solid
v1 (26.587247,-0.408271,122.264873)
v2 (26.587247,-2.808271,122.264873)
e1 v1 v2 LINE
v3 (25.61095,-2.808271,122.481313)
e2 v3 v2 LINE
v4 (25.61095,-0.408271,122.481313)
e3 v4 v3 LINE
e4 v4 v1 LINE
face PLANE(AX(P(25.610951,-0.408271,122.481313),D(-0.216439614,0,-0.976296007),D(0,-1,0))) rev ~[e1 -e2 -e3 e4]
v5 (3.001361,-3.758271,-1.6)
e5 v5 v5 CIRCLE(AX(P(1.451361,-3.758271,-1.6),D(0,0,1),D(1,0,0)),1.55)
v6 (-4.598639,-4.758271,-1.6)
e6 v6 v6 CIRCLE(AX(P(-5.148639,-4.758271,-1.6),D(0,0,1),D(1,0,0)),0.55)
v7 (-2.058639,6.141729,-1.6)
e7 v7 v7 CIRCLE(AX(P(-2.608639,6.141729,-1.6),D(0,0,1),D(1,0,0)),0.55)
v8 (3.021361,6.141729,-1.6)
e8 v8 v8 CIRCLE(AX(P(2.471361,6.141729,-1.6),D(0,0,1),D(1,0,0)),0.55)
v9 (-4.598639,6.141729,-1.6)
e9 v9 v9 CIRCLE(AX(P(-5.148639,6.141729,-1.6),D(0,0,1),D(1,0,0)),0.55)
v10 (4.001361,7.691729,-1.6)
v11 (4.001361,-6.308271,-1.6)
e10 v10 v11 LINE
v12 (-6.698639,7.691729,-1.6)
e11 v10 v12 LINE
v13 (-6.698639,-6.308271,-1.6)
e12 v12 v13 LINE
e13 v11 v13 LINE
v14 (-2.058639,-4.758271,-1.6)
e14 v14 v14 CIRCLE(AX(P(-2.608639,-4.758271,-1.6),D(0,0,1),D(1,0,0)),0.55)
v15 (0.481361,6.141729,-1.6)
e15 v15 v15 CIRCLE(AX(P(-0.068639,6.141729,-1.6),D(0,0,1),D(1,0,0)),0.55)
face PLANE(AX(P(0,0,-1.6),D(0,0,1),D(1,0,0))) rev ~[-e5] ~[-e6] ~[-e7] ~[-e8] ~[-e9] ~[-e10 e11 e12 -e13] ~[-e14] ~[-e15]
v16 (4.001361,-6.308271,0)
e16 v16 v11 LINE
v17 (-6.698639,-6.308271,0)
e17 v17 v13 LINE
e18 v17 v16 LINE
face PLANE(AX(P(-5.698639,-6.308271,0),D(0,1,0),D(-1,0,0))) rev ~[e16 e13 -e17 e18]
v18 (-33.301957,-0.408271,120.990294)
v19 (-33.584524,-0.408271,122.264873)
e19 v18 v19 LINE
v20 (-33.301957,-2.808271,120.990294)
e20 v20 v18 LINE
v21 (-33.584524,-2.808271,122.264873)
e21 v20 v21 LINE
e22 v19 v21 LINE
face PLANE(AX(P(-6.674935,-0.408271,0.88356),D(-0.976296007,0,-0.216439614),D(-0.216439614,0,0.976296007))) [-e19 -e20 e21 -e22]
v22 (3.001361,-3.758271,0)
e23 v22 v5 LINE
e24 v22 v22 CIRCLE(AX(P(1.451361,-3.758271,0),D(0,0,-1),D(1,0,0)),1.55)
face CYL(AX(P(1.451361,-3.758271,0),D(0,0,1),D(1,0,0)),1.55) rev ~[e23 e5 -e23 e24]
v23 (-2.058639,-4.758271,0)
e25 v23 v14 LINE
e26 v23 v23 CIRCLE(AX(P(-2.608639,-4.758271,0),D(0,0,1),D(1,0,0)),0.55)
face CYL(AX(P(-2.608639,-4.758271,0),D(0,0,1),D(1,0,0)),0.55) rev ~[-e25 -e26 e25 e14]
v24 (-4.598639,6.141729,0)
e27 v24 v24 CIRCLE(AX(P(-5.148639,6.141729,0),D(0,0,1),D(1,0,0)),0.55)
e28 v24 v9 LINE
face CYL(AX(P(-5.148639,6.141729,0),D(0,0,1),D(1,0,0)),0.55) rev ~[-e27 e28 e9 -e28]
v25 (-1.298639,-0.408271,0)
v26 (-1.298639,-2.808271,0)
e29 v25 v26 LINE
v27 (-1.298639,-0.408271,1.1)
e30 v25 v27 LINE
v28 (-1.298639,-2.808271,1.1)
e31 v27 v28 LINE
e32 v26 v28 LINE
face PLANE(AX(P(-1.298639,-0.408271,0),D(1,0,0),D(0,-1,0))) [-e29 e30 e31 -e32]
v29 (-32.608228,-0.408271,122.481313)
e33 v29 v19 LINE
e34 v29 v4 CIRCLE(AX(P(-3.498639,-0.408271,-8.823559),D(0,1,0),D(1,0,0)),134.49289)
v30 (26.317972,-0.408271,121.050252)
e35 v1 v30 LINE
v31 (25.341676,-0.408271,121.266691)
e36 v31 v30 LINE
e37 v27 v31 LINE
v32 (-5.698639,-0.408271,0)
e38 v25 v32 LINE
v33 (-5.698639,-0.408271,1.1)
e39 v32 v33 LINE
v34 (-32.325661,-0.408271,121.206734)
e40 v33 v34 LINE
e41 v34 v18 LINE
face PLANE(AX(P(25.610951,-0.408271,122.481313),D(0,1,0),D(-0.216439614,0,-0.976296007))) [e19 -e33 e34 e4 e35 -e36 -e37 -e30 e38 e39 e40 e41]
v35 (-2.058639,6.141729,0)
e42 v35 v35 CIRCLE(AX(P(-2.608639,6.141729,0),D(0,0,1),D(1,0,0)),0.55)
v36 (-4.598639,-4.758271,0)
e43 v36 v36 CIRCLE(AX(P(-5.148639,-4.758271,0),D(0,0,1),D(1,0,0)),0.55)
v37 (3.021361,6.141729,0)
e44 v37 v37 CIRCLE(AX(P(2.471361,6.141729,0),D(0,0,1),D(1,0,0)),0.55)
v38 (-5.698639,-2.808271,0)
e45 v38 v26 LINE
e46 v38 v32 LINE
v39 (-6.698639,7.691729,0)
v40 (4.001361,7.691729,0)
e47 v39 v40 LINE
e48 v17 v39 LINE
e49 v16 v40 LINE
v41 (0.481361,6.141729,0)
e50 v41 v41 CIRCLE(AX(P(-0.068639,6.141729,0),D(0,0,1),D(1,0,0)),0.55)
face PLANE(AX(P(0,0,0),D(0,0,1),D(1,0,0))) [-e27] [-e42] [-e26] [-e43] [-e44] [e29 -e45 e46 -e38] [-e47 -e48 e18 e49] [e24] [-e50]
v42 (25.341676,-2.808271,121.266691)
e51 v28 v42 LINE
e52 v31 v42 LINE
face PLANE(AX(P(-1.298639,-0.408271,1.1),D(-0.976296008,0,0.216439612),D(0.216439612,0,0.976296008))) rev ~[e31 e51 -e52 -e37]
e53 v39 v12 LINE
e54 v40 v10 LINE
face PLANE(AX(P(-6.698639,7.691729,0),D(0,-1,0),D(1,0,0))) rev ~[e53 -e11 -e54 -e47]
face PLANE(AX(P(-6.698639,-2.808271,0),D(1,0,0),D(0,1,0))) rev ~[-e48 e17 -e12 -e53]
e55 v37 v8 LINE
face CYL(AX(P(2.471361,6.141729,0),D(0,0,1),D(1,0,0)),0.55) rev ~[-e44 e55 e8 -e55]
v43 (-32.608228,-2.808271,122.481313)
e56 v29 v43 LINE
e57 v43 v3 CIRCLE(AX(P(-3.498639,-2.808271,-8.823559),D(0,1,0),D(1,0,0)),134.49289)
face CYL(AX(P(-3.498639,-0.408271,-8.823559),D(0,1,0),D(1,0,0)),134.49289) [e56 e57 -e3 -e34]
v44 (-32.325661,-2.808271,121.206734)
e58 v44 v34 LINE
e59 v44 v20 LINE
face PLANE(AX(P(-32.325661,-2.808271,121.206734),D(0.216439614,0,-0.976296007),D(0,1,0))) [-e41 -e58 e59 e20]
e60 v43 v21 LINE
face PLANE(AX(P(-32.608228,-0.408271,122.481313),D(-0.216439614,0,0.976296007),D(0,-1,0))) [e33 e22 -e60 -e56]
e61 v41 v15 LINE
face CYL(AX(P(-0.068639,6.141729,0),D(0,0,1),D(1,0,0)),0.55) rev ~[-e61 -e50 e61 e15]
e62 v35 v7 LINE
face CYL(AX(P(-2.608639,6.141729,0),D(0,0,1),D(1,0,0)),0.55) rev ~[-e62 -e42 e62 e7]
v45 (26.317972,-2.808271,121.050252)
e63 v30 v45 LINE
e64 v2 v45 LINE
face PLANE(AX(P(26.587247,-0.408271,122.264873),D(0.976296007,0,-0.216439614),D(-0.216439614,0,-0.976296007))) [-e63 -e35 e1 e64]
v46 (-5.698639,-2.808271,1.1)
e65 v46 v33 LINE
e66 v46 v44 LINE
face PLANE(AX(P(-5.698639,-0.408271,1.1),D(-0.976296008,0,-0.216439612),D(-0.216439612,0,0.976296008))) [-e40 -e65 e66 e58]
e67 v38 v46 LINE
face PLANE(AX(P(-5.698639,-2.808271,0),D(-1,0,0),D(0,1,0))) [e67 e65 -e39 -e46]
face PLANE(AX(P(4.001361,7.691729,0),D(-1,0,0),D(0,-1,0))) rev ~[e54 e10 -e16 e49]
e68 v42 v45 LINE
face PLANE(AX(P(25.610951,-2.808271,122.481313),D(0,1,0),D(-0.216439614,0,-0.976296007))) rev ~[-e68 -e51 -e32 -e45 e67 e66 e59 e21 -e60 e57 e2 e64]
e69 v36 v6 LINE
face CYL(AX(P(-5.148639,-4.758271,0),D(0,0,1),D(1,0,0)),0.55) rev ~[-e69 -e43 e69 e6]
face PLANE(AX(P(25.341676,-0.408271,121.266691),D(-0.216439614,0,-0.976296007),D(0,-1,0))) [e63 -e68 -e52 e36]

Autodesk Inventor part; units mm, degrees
ref_plane "YZ Plane" through (0, 0, 0) normal (1, 0, 0) x (0, 1, 0)
ref_plane "XZ Plane" through (0, 0, 0) normal (0, 1, 0) x (-1, 0, 0)
ref_plane "XY Plane" through (0, 0, 0) normal (0, 0, 1) x (1, 0, 0)
sketch "Sketch1" plane through (0, 0, 0) normal (0, 0, 1) x (1, 0, 0)
  line L0 (-6.698639, 7.691729) -> (4.001361, 7.691729)
  line L1 (4.001361, 7.691729) -> (4.001361, -6.308271)
  line L2 (4.001361, -6.308271) -> (-6.698639, -6.308271)
  line L3 (-6.698639, -6.308271) -> (-6.698639, 7.691729)
  line L4 (4.001361, -6.308271) -> (-6.698639, -6.308271)
  line L5 (-6.698639, -6.308271) -> (-6.698639, -2.808271)
  line L6 (-6.698639, -2.808271) -> (4.001361, -2.808271)
  line L7 (4.001361, -2.808271) -> (4.001361, -6.308271)
  line L8 (-6.698639, -6.308271) -> (-5.698639, -6.308271)
  line L9 (-5.698639, -6.308271) -> (-5.698639, 7.691729)
  line L10 (-5.698639, 7.691729) -> (-6.698639, 7.691729)
  line L11 (-6.698639, 7.691729) -> (-6.698639, -6.308271)
  line L12 (-5.698639, -2.808271) -> (3.472299, -2.808271)
  line L13 (3.472299, -2.808271) -> (3.472299, -0.408271)
  line L14 (3.472299, -0.408271) -> (-5.698639, -0.408271)
  line L15 (-5.698639, -0.408271) -> (-5.698639, -2.808271)
  line L16 (-5.698639, -0.408271) -> (-1.298639, -0.408271)
  line L17 (-1.298639, -0.408271) -> (-1.298639, -2.808271)
  line L18 (-1.298639, -2.808271) -> (-5.698639, -2.808271)
  line L19 (-5.698639, -2.808271) -> (-5.698639, -0.408271)
  point P0 (0, 0)
  dimension "d0" = 10.7
  dimension "d1" = 14
  dimension "d2" = 3.5
  dimension "d3" = 1
  dimension "d4" = 2.4
  dimension "d5" = 4.4
extrude "Extrusion1" add sketch "Sketch1" against normal blind 1.6
extrude "Extrusion2" add sketch "Sketch1" along normal blind 1.1 contours L14 L17 L6 L9
sketch "Sketch2" plane through (0, 0, 0) normal (0, 0, 1) x (1, 0, 0)
  line L0 (-1.298639, -0.408271) -> (-1.298639, -2.808271)
  line L1 (-1.298639, -2.808271) -> (-5.698639, -2.808271)
  line L2 (-5.698639, -2.808271) -> (-5.698639, -0.408271)
  line L3 (-5.698639, -0.408271) -> (-1.298639, -0.408271)
  line L4 (4.001361, 7.691729) -> (-6.698639, 7.691729)
  line L5 (-6.698639, 7.691729) -> (-6.698639, -6.308271)
  line L6 (-6.698639, -6.308271) -> (4.001361, -6.308271)
  line L7 (4.001361, -6.308271) -> (4.001361, 7.691729)
  line L8 (4.001361, -6.308271) -> (4.001361, 7.691729)
  line L9 (-6.698639, 7.691729) -> (-6.698639, -6.308271)
  line L10 (4.001361, -6.308271) -> (-6.698639, -6.308271)
  line L11 (-6.698639, -6.308271) -> (-6.698639, -5.308271)
  line L12 (-6.698639, -5.308271) -> (4.001361, -5.308271)
  line L13 (4.001361, -5.308271) -> (4.001361, -6.308271)
  line L14 (4.001361, -6.308271) -> (3.001361, -6.308271)
  line L15 (3.001361, -6.308271) -> (3.001361, -2.808271)
  line L16 (3.001361, -2.808271) -> (4.001361, -2.808271)
  line L17 (4.001361, -2.808271) -> (4.001361, -6.308271)
  line L18 (-6.698639, -6.308271) -> (-0.098639, -6.308271)
  line L19 (-0.098639, -6.308271) -> (-0.098639, -2.808271)
  line L20 (-0.098639, -2.808271) -> (-6.698639, -2.808271)
  line L21 (-6.698639, -2.808271) -> (-6.698639, -6.308271)
  circle A0 centre (1.451361, -3.758271) radius 1.55
  point P0 (0, 0)
  dimension "d10" = 1
  dimension "d11" = 1
  dimension "d12" = 6.6
extrude "Extrusion3" cut sketch "Sketch2" against normal through all contours A0
sketch "Sketch3" plane through (0, 0, 0) normal (0, 0, 1) x (1, 0, 0)
  line L0 (4.001361, 7.691729) -> (4.001361, -6.308271)
  line L1 (-6.698639, 7.691729) -> (4.001361, 7.691729)
  line L2 (4.001361, 7.691729) -> (4.001361, 6.691729)
  line L3 (4.001361, 6.691729) -> (-6.698639, 6.691729)
  line L4 (-6.698639, 6.691729) -> (-6.698639, 7.691729)
  line L5 (-6.698639, 7.691729) -> (-5.698639, 7.691729)
  line L6 (-5.698639, 7.691729) -> (-5.698639, 5.612457)
  line L7 (-5.698639, 5.612457) -> (-6.698639, 5.612457)
  line L8 (-6.698639, 5.612457) -> (-6.698639, 7.691729)
  line L9 (-5.698639, 6.691729) -> (-4.598639, 6.691729)
  line L10 (-4.598639, 6.691729) -> (-4.598639, 6.161753)
  line L11 (-4.598639, 6.161753) -> (-5.698639, 6.161753)
  line L12 (-5.698639, 6.161753) -> (-5.698639, 6.691729)
  circle A0 centre (-5.148639, 6.141729) radius 0.55
  circle A1 centre (-2.608639, 6.141729) radius 0.55
  line L13 (-2.058639, 6.161753) -> (-3.158639, 6.161753)
  circle A2 centre (-0.068639, 6.141729) radius 0.55
  line L14 (0.481361, 6.161753) -> (-0.618639, 6.161753)
  circle A3 centre (2.471361, 6.141729) radius 0.55
  line L15 (3.021361, 6.161753) -> (1.921361, 6.161753)
  circle A4 centre (1.451361, -3.758271) radius 1.55
  line L16 (-1.298639, -0.408271) -> (-1.298639, -2.808271)
  line L17 (-1.298639, -2.808271) -> (-5.698639, -2.808271)
  line L18 (-5.698639, -2.808271) -> (-5.698639, -0.408271)
  line L19 (-5.698639, -0.408271) -> (-1.298639, -0.408271)
  line L20 (4.001361, 7.691729) -> (-6.698639, 7.691729)
  line L21 (-6.698639, 7.691729) -> (-6.698639, -6.308271)
  line L22 (-6.698639, -6.308271) -> (4.001361, -6.308271)
  line L23 (4.001361, -6.308271) -> (4.001361, 7.691729)
  line L24 (-6.698639, -6.308271) -> (-5.698639, -6.308271)
  line L25 (-5.698639, -6.308271) -> (-5.698639, -3.371834)
  line L26 (-5.698639, -3.371834) -> (-6.698639, -3.371834)
  line L27 (-6.698639, -3.371834) -> (-6.698639, -6.308271)
  line L28 (-6.698639, -6.308271) -> (4.001361, -6.308271)
  line L29 (-6.698639, -6.308271) -> (-3.498639, -6.308271)
  line L30 (-3.498639, -6.308271) -> (-3.498639, -5.308271)
  line L31 (-3.498639, -5.308271) -> (-6.698639, -5.308271)
  line L32 (-6.698639, -5.308271) -> (-6.698639, -6.308271)
  line L33 (-5.698639, -6.308271) -> (-4.598639, -6.308271)
  line L34 (-4.598639, -6.308271) -> (-4.598639, -3.371834)
  line L35 (-4.598639, -3.371834) -> (-5.698639, -3.371834)
  line L36 (-5.698639, -3.371834) -> (-5.698639, -6.308271)
  circle A5 centre (-5.148639, -4.758271) radius 0.55
  circle A6 centre (-2.608639, -4.758271) radius 0.55
  line L37 (-0.958639, -5.308271) -> (-4.158639, -5.308271)
  point P0 (0, 0)
  dimension "d15" = 1
  dimension "d16" = 1
  dimension "d17" = 1.1
  dimension "d20" = 2.54
  dimension "d25" = 1
  dimension "d26" = 1
  dimension "d27" = 1.1
  dimension "d30" = 2.54
sketch "Sketch3 outline for Extrusion4" plane through (0, 0, 0) normal (0, 0, 1) x (1, 0, 0)
  circle A0 centre (-5.148639, -4.758271) radius 0.55
  circle A1 centre (-2.608639, -4.758271) radius 0.55
  circle A2 centre (2.471361, 6.141729) radius 0.55
  circle A3 centre (-0.068639, 6.141729) radius 0.55
  circle A4 centre (-2.608639, 6.141729) radius 0.55
  circle A5 centre (-5.148639, 6.141729) radius 0.55
extrude "Extrusion4" cut sketch "Sketch3 outline for Extrusion4" against normal through all
sketch "Sketch4" plane through (-5.698639, -0.408271, 0) normal (0, 1, 0) x (1, 0, 0)
  line L0 (0, 0) -> (4.4, 0)
  line L1 (0, 0) -> (0, -1.1)
  line L2 (4.4, -1.1) -> (0, -1.1)
  line L3 (4.4, 0) -> (4.4, -1.1)
  line L4 (0, -1.1) -> (4.4, -1.1)
  line L5 (2.2, -1.1) -> (2.2, 3.167795)
  line L6 (0, -1.1) -> (-26.909589, -122.481313)
  line L7 (0, -1.1) -> (4.299042, 18.291726)
  line L8 (4.4, -1.1) -> (31.309589, -122.481313)
  line L9 (4.4, -1.1) -> (0.100958, 18.291726)
  circle A0 centre (2.2, 8.823559) radius 134.49289
  point P0 (5.698639, 0)
  dimension "d37" = 12.5
extrude "Extrusion5" add sketch "Sketch4" against normal up to surface (2.4 mm away) contours L2 L8 A0 L6
sketch "Sketch5" plane through (-5.698639, -0.408271, 1.1) normal (-0.976296, 0, -0.2164396) x (-0.2164396, 0, 0.976296)
  line L0 (0, -2.4) -> (124.328392, -2.4)
  line L1 (124.328392, 0) -> (124.328392, -2.4)
  line L2 (0, 0) -> (124.328392, 0)
  line L3 (0, 0) -> (0, -2.4)
  line L4 (124.328392, 0) -> (124.328392, -2.4)
  line L5 (124.328392, 0) -> (111.727456, 0)
  line L6 (124.328392, -2.4) -> (123.022867, -2.4)
  line L7 (123.022867, -2.4) -> (123.022867, 0)
  line L8 (123.022867, 0) -> (124.328392, 0)
  line L9 (124.328392, 0) -> (124.328392, -2.4)
  point P0 (-2.307337, 0.408271)
  point P1 (123.022867, 0)
  point P2 (123.022867, -2.4)
extrude "Extrusion6" add sketch "Sketch5" along normal blind 1 contours L7 L2 L1 L0
sketch "Sketch6" plane through (25.610951, -0.408271, 122.481313) normal (0.976296, 0, -0.2164396) x (-0.2164396, 0, -0.976296)
  line L0 (0, -2.4) -> (124.328392, -2.4)
  line L1 (124.328392, -2.4) -> (124.328392, 0)
  line L2 (0, 0) -> (124.328392, 0)
  line L3 (0, 0) -> (0, -2.4)
  line L4 (0, 0) -> (0, -2.4)
  line L5 (0, -2.4) -> (124.328392, -2.4)
  line L6 (0, 0) -> (1.244112, 0)
  line L7 (1.244112, 0) -> (1.244112, -2.4)
  line L8 (1.244112, -2.4) -> (0, -2.4)
  line L9 (0, -2.4) -> (0, 0)
  point P0 (125.121241, 0.408271)
  point P1 (1.244112, -2.4)
  point P2 (1.244112, 0)
extrude "Extrusion7" add sketch "Sketch6" along normal blind 1 contours L3 L2 L7 L0
properties part number "TOF_VLCOS"
